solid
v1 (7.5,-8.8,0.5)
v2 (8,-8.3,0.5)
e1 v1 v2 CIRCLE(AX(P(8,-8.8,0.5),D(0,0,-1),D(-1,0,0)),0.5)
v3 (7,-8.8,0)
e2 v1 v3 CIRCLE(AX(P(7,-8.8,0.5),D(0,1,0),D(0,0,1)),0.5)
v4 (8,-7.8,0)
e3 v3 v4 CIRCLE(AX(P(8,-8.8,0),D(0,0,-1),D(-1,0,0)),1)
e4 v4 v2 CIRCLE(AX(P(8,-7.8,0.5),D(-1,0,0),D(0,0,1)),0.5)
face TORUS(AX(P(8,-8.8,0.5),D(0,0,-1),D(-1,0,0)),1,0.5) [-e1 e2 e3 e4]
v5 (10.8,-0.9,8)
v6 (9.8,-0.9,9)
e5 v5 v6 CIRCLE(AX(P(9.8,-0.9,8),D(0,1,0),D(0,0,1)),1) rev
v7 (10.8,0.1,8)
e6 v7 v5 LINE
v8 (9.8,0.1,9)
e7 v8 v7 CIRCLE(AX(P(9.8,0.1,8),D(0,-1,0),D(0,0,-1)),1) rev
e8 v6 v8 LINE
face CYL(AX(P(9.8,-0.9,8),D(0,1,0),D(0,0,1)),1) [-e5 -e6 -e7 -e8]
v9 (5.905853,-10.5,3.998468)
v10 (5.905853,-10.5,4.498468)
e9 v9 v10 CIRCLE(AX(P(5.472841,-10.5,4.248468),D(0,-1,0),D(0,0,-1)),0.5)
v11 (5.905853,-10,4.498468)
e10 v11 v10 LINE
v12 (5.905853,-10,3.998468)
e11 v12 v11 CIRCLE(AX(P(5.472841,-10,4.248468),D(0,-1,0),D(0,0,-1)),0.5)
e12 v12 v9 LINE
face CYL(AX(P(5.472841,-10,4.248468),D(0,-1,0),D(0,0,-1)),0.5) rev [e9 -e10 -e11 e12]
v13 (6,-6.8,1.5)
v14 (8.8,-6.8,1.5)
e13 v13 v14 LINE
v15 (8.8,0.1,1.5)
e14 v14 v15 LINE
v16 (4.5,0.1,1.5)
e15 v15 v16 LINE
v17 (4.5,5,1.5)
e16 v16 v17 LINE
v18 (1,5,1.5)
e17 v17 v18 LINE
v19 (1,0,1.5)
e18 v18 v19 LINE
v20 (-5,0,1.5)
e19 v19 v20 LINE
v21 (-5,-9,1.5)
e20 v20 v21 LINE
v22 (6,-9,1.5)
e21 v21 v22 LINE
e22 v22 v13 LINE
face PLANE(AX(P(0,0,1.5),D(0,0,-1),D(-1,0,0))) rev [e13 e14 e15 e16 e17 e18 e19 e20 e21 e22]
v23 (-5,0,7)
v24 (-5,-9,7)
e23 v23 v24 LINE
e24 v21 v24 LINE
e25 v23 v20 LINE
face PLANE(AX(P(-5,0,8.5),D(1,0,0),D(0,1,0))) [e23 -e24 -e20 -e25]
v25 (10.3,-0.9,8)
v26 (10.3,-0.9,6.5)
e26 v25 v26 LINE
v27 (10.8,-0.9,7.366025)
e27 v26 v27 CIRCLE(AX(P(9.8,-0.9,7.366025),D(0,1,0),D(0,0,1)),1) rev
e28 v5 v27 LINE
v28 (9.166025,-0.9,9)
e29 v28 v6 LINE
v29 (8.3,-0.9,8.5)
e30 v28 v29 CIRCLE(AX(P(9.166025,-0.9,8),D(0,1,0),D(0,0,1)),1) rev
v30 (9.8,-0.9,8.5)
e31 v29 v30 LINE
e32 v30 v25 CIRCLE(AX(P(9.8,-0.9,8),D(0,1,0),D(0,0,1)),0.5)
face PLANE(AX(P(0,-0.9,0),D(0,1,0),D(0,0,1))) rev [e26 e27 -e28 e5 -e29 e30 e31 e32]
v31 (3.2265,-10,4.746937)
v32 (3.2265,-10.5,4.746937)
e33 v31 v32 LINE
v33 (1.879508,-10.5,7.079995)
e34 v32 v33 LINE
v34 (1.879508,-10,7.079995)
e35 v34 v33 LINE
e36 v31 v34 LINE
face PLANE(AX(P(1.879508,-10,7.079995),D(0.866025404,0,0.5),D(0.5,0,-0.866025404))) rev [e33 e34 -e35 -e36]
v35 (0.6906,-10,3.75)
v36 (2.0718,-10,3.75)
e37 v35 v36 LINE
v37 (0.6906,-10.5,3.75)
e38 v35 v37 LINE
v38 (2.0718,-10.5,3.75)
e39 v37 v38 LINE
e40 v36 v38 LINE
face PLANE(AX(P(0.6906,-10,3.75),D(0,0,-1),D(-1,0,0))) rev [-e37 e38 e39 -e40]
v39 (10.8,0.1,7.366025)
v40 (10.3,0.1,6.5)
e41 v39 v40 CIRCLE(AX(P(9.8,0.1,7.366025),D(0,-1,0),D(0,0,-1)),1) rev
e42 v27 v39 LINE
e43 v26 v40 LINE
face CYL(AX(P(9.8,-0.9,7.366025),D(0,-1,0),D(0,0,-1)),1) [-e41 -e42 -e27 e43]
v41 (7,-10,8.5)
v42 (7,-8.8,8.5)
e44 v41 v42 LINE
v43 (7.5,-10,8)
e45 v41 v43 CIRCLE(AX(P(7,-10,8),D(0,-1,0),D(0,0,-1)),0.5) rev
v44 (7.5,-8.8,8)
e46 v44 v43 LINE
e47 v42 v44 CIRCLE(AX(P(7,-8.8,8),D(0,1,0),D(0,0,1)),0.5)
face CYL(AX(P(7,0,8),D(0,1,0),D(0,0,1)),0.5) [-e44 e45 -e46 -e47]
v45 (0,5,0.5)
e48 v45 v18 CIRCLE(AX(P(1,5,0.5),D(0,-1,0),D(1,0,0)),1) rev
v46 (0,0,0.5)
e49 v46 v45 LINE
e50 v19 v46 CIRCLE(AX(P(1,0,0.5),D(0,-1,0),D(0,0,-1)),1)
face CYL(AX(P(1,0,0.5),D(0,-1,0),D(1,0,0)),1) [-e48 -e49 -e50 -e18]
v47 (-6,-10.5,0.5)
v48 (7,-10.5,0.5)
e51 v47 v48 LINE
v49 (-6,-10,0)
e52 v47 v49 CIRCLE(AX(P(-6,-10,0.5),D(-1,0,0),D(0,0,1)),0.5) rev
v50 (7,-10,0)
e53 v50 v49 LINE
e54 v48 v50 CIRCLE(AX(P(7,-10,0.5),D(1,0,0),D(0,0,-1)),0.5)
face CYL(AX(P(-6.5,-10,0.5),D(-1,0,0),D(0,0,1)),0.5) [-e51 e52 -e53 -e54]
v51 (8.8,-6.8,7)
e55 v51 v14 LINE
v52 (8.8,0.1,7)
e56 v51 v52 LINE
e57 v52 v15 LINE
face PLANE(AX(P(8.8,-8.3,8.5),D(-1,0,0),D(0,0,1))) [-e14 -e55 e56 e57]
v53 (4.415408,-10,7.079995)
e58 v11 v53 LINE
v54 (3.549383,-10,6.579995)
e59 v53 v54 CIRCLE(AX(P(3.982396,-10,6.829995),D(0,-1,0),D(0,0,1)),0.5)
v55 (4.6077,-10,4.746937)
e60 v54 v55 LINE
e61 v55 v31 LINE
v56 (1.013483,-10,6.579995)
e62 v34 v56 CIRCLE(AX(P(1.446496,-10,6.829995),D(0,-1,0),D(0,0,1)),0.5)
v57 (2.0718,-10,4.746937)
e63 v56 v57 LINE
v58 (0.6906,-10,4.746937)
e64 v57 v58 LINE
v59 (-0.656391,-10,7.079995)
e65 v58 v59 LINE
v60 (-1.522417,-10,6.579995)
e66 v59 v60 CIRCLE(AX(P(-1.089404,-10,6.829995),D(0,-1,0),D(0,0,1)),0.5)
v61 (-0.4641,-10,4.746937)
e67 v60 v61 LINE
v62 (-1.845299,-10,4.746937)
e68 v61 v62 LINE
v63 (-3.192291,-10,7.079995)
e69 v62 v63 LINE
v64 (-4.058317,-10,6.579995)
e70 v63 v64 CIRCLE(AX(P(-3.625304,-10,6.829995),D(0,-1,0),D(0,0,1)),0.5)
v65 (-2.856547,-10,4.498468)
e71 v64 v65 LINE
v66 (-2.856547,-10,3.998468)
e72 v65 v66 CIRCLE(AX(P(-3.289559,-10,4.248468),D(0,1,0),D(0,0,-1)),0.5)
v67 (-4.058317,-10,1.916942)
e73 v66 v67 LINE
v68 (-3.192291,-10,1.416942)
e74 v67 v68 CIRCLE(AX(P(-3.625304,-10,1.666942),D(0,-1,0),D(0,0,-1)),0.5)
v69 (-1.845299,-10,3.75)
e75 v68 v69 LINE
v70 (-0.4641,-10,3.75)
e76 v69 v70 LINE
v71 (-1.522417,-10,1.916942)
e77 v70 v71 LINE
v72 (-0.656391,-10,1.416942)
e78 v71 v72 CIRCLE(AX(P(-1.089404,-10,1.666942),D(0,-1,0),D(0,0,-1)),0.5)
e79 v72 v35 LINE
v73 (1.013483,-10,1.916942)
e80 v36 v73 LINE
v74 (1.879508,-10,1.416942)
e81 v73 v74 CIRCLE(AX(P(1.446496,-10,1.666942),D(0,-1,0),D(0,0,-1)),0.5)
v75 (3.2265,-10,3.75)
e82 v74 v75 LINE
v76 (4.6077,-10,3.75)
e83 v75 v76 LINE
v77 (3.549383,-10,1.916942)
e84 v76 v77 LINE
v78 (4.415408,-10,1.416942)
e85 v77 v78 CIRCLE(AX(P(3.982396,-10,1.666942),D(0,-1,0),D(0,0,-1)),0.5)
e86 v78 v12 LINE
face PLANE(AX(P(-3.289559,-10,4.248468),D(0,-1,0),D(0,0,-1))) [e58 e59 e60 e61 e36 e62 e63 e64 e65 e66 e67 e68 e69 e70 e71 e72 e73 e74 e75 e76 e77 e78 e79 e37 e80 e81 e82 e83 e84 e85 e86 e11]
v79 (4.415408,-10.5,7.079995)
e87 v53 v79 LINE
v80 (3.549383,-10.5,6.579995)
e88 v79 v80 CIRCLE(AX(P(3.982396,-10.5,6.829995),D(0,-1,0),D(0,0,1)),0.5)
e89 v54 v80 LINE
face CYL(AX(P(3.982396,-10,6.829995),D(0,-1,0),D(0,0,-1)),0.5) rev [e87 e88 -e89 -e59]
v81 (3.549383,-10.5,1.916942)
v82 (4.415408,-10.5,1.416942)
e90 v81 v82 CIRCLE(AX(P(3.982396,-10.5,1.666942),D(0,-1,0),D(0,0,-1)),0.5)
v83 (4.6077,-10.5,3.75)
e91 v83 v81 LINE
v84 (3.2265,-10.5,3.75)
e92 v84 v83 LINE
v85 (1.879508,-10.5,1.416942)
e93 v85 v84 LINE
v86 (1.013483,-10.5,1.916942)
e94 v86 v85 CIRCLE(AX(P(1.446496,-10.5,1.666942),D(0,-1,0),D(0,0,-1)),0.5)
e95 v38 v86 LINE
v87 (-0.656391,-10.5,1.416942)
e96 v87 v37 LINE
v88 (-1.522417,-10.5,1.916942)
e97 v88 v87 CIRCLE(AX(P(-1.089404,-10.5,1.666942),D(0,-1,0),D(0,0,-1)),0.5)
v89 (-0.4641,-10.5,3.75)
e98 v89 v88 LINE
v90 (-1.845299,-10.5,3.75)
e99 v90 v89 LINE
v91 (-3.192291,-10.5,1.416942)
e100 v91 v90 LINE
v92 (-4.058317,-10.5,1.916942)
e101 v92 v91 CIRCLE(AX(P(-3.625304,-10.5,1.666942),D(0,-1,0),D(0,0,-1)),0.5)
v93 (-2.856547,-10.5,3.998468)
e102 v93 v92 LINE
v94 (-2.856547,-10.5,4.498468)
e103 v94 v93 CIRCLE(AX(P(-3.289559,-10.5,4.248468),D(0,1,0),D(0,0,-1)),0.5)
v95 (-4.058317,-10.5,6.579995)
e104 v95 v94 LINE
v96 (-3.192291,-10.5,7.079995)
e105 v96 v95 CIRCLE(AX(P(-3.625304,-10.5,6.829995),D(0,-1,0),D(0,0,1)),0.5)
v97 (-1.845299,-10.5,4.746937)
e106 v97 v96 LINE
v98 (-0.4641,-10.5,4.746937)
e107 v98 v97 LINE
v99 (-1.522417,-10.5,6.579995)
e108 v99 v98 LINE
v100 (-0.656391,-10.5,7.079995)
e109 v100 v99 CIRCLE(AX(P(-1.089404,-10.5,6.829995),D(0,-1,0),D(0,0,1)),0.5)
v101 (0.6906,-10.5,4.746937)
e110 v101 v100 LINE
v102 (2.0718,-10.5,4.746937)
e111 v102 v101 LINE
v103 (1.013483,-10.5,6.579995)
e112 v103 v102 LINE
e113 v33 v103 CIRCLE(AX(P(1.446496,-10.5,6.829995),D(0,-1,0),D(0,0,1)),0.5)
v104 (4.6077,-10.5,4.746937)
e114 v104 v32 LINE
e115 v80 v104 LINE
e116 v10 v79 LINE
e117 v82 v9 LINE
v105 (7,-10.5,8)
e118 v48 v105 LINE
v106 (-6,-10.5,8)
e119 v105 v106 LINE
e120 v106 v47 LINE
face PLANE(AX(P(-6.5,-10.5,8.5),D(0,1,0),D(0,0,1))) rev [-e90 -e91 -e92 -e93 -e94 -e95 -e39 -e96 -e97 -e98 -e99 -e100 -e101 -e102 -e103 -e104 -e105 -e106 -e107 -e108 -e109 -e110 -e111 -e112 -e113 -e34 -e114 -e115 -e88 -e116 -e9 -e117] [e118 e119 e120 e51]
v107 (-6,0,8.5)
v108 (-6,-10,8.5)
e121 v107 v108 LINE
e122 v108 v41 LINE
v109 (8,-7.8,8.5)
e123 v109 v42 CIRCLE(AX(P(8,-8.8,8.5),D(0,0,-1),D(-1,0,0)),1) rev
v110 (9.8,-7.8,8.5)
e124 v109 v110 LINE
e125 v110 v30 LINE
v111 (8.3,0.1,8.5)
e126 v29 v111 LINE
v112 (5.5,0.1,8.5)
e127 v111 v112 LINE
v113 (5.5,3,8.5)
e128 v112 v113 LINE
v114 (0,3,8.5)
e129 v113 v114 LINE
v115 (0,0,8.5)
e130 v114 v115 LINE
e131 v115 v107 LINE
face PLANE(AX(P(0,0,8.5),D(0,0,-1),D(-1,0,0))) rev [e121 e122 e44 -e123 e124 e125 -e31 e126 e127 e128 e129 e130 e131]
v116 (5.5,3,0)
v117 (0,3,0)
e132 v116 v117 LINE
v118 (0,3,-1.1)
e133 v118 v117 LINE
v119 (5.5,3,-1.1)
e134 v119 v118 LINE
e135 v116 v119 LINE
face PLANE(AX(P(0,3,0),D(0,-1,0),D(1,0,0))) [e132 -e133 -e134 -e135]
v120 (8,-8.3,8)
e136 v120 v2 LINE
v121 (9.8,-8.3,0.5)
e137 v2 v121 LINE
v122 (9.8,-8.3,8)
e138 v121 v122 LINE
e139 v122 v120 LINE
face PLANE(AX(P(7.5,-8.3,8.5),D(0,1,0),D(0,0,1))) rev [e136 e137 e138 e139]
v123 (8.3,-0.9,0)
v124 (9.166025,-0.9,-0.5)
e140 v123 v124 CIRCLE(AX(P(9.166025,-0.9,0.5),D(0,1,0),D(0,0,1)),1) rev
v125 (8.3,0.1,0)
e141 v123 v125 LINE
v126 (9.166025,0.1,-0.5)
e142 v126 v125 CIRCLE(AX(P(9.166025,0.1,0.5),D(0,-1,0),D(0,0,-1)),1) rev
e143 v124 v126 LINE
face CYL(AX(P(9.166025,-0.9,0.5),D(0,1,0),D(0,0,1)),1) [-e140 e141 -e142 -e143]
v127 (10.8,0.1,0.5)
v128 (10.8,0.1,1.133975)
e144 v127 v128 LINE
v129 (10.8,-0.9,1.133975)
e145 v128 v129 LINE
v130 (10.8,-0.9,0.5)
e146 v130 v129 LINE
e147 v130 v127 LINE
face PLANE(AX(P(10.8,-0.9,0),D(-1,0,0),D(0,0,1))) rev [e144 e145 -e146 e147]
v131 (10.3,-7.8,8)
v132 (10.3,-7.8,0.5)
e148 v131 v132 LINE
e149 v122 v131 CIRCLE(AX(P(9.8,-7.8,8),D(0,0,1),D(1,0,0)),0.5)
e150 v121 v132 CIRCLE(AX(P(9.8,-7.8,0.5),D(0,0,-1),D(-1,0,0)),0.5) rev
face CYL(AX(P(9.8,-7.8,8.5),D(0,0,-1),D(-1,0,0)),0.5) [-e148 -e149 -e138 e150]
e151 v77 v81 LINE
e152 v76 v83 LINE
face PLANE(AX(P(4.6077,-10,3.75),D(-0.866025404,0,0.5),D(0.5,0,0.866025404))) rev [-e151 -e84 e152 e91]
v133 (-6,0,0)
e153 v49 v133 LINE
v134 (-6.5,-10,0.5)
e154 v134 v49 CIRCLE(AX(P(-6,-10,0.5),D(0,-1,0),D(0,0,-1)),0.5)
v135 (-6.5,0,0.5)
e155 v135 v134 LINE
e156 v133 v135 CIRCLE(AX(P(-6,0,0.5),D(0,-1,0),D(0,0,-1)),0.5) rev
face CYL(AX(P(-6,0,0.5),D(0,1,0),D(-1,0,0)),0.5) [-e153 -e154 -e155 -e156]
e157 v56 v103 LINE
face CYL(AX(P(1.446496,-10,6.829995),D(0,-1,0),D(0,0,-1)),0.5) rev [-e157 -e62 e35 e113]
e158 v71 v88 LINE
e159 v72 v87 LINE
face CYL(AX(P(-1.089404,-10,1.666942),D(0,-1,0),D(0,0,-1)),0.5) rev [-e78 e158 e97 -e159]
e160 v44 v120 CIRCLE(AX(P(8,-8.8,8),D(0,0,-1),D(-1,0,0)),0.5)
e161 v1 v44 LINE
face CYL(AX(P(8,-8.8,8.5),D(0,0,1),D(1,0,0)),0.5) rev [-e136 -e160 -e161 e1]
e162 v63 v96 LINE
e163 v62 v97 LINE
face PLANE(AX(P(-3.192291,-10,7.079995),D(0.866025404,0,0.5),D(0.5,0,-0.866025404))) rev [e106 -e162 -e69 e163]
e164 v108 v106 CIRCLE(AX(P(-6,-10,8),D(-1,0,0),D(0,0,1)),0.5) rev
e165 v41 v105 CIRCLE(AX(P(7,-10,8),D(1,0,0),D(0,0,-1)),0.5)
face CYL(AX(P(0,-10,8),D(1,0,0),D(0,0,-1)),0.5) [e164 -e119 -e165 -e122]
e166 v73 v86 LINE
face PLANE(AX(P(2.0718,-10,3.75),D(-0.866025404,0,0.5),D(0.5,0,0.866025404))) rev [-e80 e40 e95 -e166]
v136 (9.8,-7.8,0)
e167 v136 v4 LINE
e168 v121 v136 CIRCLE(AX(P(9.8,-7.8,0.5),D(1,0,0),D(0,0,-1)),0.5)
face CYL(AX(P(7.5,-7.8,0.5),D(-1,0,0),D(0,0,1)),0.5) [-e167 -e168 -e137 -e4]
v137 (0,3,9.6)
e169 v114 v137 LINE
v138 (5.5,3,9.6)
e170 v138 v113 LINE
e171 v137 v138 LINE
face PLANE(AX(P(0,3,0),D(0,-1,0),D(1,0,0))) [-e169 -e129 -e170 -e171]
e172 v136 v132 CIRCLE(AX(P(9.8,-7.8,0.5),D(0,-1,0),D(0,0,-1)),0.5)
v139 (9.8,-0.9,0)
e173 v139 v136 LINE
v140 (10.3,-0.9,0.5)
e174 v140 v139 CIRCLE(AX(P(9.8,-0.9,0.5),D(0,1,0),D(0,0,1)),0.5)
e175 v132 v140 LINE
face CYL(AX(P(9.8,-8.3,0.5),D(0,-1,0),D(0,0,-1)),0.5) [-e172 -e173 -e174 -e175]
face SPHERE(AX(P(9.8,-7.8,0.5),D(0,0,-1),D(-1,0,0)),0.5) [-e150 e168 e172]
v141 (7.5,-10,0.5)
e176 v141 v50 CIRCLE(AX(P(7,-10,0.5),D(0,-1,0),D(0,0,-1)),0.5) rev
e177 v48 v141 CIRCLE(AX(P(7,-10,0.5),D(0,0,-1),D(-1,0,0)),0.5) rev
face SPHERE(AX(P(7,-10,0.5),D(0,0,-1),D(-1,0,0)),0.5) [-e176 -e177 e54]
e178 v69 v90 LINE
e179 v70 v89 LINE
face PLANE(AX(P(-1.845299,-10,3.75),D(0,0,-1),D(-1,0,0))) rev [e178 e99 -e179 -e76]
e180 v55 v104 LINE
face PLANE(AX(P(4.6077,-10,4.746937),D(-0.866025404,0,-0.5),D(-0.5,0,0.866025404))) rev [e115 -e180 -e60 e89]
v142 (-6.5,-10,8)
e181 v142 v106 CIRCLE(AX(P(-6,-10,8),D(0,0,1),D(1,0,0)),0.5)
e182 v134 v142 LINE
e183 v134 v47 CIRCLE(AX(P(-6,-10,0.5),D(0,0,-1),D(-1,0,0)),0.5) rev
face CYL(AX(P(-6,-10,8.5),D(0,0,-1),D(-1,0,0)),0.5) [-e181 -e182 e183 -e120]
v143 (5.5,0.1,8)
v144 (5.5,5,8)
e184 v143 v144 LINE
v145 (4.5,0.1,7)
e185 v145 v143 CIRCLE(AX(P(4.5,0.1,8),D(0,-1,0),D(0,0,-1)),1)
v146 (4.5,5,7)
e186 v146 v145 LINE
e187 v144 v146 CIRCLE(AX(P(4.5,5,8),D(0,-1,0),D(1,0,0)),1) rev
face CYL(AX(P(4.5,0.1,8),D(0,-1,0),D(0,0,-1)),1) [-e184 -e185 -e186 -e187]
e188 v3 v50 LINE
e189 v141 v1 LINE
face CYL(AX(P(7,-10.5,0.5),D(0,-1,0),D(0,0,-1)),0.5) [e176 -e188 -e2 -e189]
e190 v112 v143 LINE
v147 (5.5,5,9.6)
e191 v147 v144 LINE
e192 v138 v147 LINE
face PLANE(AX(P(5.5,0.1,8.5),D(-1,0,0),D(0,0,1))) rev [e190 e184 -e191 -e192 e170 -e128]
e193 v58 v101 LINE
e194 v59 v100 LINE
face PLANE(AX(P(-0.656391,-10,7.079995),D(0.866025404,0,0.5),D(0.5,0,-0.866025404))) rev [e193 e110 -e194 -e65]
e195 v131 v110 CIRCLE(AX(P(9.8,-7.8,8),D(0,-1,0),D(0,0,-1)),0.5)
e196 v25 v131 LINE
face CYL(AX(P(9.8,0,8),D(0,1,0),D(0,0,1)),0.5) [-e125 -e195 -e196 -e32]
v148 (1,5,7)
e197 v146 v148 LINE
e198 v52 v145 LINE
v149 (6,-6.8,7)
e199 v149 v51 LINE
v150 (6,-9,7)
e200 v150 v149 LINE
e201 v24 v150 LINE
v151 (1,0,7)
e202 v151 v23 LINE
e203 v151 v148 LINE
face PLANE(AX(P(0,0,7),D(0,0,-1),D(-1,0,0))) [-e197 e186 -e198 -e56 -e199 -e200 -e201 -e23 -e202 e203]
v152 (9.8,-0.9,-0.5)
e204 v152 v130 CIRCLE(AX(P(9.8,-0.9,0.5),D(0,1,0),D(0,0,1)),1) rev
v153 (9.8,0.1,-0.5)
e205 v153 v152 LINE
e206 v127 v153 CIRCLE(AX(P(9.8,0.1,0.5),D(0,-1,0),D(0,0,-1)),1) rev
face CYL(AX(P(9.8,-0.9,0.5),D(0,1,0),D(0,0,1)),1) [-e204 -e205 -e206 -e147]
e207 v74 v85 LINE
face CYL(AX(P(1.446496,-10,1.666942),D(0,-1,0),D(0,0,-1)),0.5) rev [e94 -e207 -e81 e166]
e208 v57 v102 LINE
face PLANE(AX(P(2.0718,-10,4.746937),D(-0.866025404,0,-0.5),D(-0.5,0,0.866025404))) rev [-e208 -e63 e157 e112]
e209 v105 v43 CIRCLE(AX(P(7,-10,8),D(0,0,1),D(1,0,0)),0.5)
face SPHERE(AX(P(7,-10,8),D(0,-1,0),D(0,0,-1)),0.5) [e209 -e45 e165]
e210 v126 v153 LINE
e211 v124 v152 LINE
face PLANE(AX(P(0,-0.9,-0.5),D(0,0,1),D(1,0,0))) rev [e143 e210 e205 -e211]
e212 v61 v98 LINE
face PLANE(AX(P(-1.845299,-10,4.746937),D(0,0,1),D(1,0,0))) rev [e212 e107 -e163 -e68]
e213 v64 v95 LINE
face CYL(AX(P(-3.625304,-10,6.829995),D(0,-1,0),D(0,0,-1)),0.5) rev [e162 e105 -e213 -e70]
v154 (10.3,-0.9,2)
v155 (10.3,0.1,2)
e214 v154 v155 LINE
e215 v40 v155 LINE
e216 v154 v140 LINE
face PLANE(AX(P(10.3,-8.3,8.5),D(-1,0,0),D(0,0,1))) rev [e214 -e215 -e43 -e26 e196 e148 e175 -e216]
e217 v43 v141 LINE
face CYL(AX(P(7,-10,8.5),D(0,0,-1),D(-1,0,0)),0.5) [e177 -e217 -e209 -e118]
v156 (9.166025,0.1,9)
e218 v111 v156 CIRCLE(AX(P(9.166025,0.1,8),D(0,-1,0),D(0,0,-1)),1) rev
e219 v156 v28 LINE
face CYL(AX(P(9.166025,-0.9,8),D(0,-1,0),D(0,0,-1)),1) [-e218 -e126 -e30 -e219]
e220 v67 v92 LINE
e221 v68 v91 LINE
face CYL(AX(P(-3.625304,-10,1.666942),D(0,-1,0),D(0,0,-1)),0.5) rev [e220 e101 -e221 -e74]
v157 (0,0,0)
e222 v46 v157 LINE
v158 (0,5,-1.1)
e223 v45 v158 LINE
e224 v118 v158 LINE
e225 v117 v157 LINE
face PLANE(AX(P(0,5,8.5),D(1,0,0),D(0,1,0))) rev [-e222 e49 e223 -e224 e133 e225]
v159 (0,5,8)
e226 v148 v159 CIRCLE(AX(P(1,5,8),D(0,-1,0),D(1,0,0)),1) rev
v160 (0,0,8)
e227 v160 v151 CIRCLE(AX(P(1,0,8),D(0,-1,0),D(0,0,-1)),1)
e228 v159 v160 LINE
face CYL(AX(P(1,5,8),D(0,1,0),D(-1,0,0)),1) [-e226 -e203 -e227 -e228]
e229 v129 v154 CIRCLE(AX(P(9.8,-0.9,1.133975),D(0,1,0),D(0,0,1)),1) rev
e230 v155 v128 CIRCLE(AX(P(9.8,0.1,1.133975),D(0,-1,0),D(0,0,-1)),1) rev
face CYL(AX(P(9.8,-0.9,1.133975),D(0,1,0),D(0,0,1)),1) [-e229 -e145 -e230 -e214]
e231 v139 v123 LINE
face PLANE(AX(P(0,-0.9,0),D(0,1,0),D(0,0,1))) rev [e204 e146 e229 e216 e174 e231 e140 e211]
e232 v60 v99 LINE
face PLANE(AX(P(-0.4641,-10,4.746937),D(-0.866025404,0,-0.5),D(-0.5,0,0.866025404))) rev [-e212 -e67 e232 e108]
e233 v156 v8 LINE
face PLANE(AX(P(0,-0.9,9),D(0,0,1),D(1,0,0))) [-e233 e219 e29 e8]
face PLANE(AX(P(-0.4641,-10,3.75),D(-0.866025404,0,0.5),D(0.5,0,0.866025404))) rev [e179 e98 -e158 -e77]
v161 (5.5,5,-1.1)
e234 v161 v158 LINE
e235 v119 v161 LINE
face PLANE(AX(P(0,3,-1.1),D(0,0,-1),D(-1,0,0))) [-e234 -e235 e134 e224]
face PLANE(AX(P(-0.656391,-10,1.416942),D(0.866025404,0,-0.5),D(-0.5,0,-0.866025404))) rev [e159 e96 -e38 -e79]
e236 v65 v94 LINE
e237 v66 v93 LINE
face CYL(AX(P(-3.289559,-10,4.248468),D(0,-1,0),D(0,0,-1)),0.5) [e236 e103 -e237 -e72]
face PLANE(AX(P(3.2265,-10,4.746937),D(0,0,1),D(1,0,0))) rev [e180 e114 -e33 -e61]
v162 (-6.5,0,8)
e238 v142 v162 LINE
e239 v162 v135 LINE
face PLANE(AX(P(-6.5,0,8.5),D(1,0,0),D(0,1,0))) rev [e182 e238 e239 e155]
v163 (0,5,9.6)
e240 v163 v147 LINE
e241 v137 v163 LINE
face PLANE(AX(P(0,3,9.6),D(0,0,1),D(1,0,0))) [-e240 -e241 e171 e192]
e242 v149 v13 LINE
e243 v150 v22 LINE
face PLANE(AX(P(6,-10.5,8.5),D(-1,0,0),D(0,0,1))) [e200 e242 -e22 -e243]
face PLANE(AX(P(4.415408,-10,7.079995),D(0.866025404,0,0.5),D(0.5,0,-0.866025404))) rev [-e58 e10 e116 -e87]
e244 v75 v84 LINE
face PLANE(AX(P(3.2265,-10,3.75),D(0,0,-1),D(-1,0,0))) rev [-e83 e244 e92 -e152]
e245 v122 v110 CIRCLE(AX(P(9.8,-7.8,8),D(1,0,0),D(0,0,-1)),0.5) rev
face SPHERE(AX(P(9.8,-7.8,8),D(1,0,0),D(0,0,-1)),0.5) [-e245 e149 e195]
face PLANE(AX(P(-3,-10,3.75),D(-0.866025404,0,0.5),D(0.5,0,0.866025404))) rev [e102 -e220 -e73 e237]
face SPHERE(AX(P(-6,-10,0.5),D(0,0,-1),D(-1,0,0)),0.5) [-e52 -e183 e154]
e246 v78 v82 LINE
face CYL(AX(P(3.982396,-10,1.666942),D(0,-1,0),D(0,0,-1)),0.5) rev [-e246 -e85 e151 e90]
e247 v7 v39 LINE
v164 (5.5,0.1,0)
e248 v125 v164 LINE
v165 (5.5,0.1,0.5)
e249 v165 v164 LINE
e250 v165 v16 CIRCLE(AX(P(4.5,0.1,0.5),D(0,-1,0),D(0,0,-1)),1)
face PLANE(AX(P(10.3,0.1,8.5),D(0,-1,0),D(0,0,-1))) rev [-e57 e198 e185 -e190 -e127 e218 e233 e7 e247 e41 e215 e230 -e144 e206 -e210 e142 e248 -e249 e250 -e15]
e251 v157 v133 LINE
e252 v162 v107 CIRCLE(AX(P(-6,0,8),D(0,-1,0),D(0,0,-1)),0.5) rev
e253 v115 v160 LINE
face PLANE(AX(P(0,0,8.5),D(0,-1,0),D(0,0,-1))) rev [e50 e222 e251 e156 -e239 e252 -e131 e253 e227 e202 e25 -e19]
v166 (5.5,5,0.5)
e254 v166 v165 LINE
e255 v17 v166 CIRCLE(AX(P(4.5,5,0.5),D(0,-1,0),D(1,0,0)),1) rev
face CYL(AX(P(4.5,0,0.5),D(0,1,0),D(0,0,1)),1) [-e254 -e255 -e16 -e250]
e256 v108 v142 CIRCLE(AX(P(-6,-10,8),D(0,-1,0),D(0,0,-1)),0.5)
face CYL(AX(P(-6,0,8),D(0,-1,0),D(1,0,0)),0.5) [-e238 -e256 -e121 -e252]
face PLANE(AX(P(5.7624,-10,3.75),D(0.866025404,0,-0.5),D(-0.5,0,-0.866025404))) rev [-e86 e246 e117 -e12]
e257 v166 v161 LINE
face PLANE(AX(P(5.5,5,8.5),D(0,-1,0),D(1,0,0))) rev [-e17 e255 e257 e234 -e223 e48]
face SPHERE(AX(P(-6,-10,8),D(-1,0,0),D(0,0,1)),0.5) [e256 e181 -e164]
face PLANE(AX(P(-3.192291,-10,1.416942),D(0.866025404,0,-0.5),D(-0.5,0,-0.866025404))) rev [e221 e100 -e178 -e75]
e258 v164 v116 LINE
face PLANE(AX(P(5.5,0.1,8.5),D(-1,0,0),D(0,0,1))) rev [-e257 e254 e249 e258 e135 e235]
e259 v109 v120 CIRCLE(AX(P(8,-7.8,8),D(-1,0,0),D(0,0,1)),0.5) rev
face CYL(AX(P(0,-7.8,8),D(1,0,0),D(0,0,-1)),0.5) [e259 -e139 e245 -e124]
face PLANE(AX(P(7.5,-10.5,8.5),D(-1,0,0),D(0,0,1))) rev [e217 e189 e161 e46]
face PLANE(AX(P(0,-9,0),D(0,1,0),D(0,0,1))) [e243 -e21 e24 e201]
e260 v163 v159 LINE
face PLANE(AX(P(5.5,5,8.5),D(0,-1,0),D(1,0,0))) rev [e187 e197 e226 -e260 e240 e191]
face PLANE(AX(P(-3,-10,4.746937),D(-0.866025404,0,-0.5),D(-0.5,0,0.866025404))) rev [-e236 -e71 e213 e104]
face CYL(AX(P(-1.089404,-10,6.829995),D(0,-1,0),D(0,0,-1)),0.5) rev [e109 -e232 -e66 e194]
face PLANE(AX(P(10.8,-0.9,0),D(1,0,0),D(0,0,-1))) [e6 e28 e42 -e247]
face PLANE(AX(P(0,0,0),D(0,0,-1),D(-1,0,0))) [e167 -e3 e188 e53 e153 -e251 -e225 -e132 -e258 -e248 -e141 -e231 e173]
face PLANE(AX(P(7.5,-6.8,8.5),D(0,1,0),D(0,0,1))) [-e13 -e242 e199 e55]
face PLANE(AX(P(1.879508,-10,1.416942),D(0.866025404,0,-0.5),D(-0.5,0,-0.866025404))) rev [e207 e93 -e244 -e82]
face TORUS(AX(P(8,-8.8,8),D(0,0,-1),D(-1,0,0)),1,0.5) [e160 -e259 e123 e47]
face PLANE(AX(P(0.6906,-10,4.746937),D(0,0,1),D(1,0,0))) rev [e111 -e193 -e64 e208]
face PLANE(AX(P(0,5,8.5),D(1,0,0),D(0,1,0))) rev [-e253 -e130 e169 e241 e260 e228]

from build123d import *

# Parameters (mm, degrees)
BOSS_EXTRUDE1_DEPTH = 8.5
SHELL1_T            = -1.5
SKETCH3_W           = 14
SKETCH3_H           = 8.5
BOSS_EXTRUDE2_DEPTH = 1.5
CUT_EXTRUDE1_DEPTH  = 0.5
BOSS_EXTRUDE4_DEPTH = 1
FILLET2_R           = 1
SKETCH6_W           = 5.5
SKETCH6_H           = 2.6
BOSS_EXTRUDE5_DEPTH = 2
FILLET3_R           = 0.5
FILLET4_R           = 1


with BuildPart() as part:
    # Sketch1 → Boss-Extrude1 (new body)
    with BuildSketch(Plane.XY):
        Polygon((0, 0), (-6.5, 0), (-6.5, -10.5), (7.5, -10.5), (7.5, -8.3), (10.3, -8.3), (10.3, 0.1), (5.5, 0.1), (5.5, 5), (0, 5), align=None)
    extrude(amount=BOSS_EXTRUDE1_DEPTH)

    # Shell1
    shell1_openings = [part.faces().sort_by_distance(p)[0] for p in [
        (2.75, 5, 4.25),
        (5.5, 2.55, 4.25),
        (7.9, 0.1, 4.25),
        (0.5, -10.5, 4.25),
        (-3.25, 0, 4.25),
        (0, 2.5, 4.25),
    ]]
    offset(amount=SHELL1_T, openings=shell1_openings, kind=Kind.INTERSECTION)

    # Sketch3 → Boss-Extrude2 (add)
    with BuildSketch(Plane.XZ.offset(10.5)):
        with Locations((0.5, 4.25)):
            Rectangle(SKETCH3_W, SKETCH3_H)
    extrude(amount=-BOSS_EXTRUDE2_DEPTH)

    # Sketch4 → Cut-Extrude1 (cut)
    with BuildSketch(Plane.XZ.offset(10.5)):
        with BuildLine():
            Line((-3, 3.75), (-4.058316713, 1.916941682))
            ThreePointArc((-4.058316713, 1.916941682), (-3.875304011, 1.23392898), (-3.192291309, 1.416941682))
            Line((-3.192291309, 1.416941682), (-1.845299462, 3.75))
            Line((-1.845299462, 3.75), (-0.464100143, 3.75))
            Line((-0.464100143, 3.75), (-1.522416856, 1.916941682))
            ThreePointArc((-1.522416856, 1.916941682), (-1.339404154, 1.23392898), (-0.656391453, 1.416941682))
            Line((-0.656391453, 1.416941682), (0.690600395, 3.75))
            Line((0.690600395, 3.75), (2.071799714, 3.75))
            Line((2.071799714, 3.75), (1.013483001, 1.916941682))
            ThreePointArc((1.013483001, 1.916941682), (1.196495702, 1.23392898), (1.879508404, 1.416941682))
            Line((1.879508404, 1.416941682), (3.226500252, 3.75))
            Line((3.226500252, 3.75), (4.607699571, 3.75))
            Line((4.607699571, 3.75), (3.549382857, 1.916941682))
            ThreePointArc((3.549382857, 1.916941682), (3.732395559, 1.23392898), (4.415408261, 1.416941682))
            Line((4.415408261, 1.416941682), (5.762400109, 3.75))
            Line((5.762400109, 3.75), (5.90585335, 3.998468302))
            ThreePointArc((5.90585335, 3.998468302), (5.972840648, 4.248468302), (5.90585335, 4.498468302))
            Line((5.90585335, 4.498468302), (5.762400109, 4.746936604))
            Line((5.762400109, 4.746936604), (4.415408261, 7.079994922))
            ThreePointArc((4.415408261, 7.079994922), (3.732395559, 7.263007624), (3.549382857, 6.579994922))
            Line((3.549382857, 6.579994922), (4.607699571, 4.746936604))
            Line((4.607699571, 4.746936604), (3.226500252, 4.746936604))
            Line((3.226500252, 4.746936604), (1.879508404, 7.079994922))
            ThreePointArc((1.879508404, 7.079994922), (1.196495702, 7.263007624), (1.013483001, 6.579994922))
            Line((1.013483001, 6.579994922), (2.071799714, 4.746936604))
            Line((2.071799714, 4.746936604), (0.690600395, 4.746936604))
            Line((0.690600395, 4.746936604), (-0.656391453, 7.079994922))
            ThreePointArc((-0.656391453, 7.079994922), (-1.339404154, 7.263007624), (-1.522416856, 6.579994922))
            Line((-1.522416856, 6.579994922), (-0.464100143, 4.746936604))
            Line((-0.464100143, 4.746936604), (-1.845299462, 4.746936604))
            Line((-1.845299462, 4.746936604), (-3.192291309, 7.079994922))
            ThreePointArc((-3.192291309, 7.079994922), (-3.875304011, 7.263007624), (-4.058316713, 6.579994922))
            Line((-4.058316713, 6.579994922), (-3, 4.746936604))
            Line((-3, 4.746936604), (-2.856546759, 4.498468302))
            ThreePointArc((-2.856546759, 4.498468302), (-2.789559461, 4.248468302), (-2.856546759, 3.998468302))
            Line((-2.856546759, 3.998468302), (-3, 3.75))
        make_face()
    extrude(amount=-CUT_EXTRUDE1_DEPTH, mode=Mode.SUBTRACT)

    # Sketch5 → Boss-Extrude4 (add)
    with BuildSketch(Plane(origin=(0, 0.1, 0), x_dir=(1, 0, 0), z_dir=(0, 1, 0))):
        Polygon((10.3, 0.5), (8.3, 0.5), (8.3, 0), (10.3, 0), (10.3, -2), (10.8, -2), (10.8, 0.5), align=None)
        Polygon((10.8, -6.5), (10.3, -6.5), (10.3, -8.5), (8.3, -8.5), (8.3, -9), (10.3, -9), (10.8, -9), align=None)
    extrude(amount=-BOSS_EXTRUDE4_DEPTH)

    # Fillet2
    # the kernel refuses this fillet: 1 mm, written as the material it takes off along each edge
    with BuildSketch(Plane(origin=(8.3, 2.265063509, -0.5), x_dir=(0, 0, 1), z_dir=(0, -1, 0)), Plane(origin=(10.8, 2.265063509, 6.5), x_dir=(-1, 0, 0), z_dir=(0, -1, 0))) as fillet2_piece_1:
        with BuildLine():
            CenterArc((1, -0.866025404), FILLET2_R, 120, 60)
            Line((0, -0.866025404), (-0.02, -0.866025404))
            Line((-0.02, -0.866025404), (-0.02, 0))
            Line((-0.02, 0), (0, 0.02))
            ThreePointArc((0, 0.02), (0.25, 0.02), (0.49, 0.017320508))
            Line((0.49, 0.017320508), (0.5, 0))
        make_face()
    extrude(amount=5.330127019, mode=Mode.SUBTRACT)
    with BuildSketch(Plane(origin=(10.8, 2.265063509, 2), x_dir=(-1, 0, 0), z_dir=(0, -1, 0)), Plane(origin=(8.3, 2.265063509, 9), x_dir=(0, 0, -1), z_dir=(0, -1, 0))) as fillet2_piece_2:
        with BuildLine():
            CenterArc((1, 0.866025404), FILLET2_R, 180, 60)
            Line((0, 0.866025404), (-0.02, 0.866025404))
            Line((-0.02, 0.866025404), (-0.02, 0))
            Line((-0.02, 0), (0, -0.02))
            ThreePointArc((0, -0.02), (0.25, -0.02), (0.49, -0.017320508))
            Line((0.49, -0.017320508), (0.5, 0))
        make_face()
    extrude(amount=5.330127019, mode=Mode.SUBTRACT)
    with BuildSketch(Plane(origin=(10.8, 2.6, -0.5), x_dir=(-1, 0, 0), z_dir=(0, -1, 0))) as fillet2_piece_3:
        with BuildLine():
            CenterArc((FILLET2_R, -FILLET2_R), FILLET2_R, 90, 90)
            Line((0, -FILLET2_R), (-FILLET2_R * 0.02, -FILLET2_R))
            Line((-FILLET2_R * 0.02, -FILLET2_R), (-FILLET2_R * 0.02, FILLET2_R * 0.02))
            Line((-FILLET2_R * 0.02, FILLET2_R * 0.02), (FILLET2_R, FILLET2_R * 0.02))
            Line((FILLET2_R, FILLET2_R * 0.02), (FILLET2_R, 0))
        make_face()
    extrude(amount=6, mode=Mode.SUBTRACT)
    with BuildSketch(Plane(origin=(10.8, 2.6, 9), x_dir=(-1, 0, 0), z_dir=(0, -1, 0))) as fillet2_piece_4:
        with BuildLine():
            CenterArc((FILLET2_R, FILLET2_R), FILLET2_R, 180, 90)
            Line((0, FILLET2_R), (-FILLET2_R * 0.02, FILLET2_R))
            Line((-FILLET2_R * 0.02, FILLET2_R), (-FILLET2_R * 0.02, -FILLET2_R * 0.02))
            Line((-FILLET2_R * 0.02, -FILLET2_R * 0.02), (FILLET2_R, -FILLET2_R * 0.02))
            Line((FILLET2_R, -FILLET2_R * 0.02), (FILLET2_R, 0))
        make_face()
    extrude(amount=6, mode=Mode.SUBTRACT)

    # Sketch6 → Boss-Extrude5 (add)
    with BuildSketch(Plane(origin=(0, 5, 0), x_dir=(1, 0, 0), z_dir=(0, 1, 0))):
        with Locations((2.75, -8.3)):
            Rectangle(SKETCH6_W, SKETCH6_H)
        with Locations((2.75, -0.2)):
            Rectangle(SKETCH6_W, SKETCH6_H)
    extrude(amount=-BOSS_EXTRUDE5_DEPTH)

    # Fillet3
    fillet3_edges = [part.edges().sort_by_distance(p)[0] for p in [
        (10.3, -4.6, 0),
        (8.9, -8.3, 0),
        (7.5, -9.4, 0),
        (0.5, -10.5, 0),
        (-6.5, -5.25, 8.5),
        (-6.5, -5.25, 0),
        (0.5, -10.5, 8.5),
        (10.3, -8.3, 4.25),
        (7.5, -8.3, 4.25),
        (7.5, -10.5, 4.25),
        (-6.5, -10.5, 4.25),
        (7.5, -9.4, 8.5),
        (8.9, -8.3, 8.5),
        (10.3, -4.6, 8.5),
    ]]
    fillet(fillet3_edges, radius=FILLET3_R)

    # Fillet4
    fillet4_edges = [part.edges().sort_by_distance(p)[0] for p in [
        (0, 2.5, 1.5),
        (5.5, 2.55, 1.5),
        (0, 2.5, 7),
        (5.5, 2.55, 7),
    ]]
    fillet(fillet4_edges, radius=FILLET4_R)


solid = part.part
